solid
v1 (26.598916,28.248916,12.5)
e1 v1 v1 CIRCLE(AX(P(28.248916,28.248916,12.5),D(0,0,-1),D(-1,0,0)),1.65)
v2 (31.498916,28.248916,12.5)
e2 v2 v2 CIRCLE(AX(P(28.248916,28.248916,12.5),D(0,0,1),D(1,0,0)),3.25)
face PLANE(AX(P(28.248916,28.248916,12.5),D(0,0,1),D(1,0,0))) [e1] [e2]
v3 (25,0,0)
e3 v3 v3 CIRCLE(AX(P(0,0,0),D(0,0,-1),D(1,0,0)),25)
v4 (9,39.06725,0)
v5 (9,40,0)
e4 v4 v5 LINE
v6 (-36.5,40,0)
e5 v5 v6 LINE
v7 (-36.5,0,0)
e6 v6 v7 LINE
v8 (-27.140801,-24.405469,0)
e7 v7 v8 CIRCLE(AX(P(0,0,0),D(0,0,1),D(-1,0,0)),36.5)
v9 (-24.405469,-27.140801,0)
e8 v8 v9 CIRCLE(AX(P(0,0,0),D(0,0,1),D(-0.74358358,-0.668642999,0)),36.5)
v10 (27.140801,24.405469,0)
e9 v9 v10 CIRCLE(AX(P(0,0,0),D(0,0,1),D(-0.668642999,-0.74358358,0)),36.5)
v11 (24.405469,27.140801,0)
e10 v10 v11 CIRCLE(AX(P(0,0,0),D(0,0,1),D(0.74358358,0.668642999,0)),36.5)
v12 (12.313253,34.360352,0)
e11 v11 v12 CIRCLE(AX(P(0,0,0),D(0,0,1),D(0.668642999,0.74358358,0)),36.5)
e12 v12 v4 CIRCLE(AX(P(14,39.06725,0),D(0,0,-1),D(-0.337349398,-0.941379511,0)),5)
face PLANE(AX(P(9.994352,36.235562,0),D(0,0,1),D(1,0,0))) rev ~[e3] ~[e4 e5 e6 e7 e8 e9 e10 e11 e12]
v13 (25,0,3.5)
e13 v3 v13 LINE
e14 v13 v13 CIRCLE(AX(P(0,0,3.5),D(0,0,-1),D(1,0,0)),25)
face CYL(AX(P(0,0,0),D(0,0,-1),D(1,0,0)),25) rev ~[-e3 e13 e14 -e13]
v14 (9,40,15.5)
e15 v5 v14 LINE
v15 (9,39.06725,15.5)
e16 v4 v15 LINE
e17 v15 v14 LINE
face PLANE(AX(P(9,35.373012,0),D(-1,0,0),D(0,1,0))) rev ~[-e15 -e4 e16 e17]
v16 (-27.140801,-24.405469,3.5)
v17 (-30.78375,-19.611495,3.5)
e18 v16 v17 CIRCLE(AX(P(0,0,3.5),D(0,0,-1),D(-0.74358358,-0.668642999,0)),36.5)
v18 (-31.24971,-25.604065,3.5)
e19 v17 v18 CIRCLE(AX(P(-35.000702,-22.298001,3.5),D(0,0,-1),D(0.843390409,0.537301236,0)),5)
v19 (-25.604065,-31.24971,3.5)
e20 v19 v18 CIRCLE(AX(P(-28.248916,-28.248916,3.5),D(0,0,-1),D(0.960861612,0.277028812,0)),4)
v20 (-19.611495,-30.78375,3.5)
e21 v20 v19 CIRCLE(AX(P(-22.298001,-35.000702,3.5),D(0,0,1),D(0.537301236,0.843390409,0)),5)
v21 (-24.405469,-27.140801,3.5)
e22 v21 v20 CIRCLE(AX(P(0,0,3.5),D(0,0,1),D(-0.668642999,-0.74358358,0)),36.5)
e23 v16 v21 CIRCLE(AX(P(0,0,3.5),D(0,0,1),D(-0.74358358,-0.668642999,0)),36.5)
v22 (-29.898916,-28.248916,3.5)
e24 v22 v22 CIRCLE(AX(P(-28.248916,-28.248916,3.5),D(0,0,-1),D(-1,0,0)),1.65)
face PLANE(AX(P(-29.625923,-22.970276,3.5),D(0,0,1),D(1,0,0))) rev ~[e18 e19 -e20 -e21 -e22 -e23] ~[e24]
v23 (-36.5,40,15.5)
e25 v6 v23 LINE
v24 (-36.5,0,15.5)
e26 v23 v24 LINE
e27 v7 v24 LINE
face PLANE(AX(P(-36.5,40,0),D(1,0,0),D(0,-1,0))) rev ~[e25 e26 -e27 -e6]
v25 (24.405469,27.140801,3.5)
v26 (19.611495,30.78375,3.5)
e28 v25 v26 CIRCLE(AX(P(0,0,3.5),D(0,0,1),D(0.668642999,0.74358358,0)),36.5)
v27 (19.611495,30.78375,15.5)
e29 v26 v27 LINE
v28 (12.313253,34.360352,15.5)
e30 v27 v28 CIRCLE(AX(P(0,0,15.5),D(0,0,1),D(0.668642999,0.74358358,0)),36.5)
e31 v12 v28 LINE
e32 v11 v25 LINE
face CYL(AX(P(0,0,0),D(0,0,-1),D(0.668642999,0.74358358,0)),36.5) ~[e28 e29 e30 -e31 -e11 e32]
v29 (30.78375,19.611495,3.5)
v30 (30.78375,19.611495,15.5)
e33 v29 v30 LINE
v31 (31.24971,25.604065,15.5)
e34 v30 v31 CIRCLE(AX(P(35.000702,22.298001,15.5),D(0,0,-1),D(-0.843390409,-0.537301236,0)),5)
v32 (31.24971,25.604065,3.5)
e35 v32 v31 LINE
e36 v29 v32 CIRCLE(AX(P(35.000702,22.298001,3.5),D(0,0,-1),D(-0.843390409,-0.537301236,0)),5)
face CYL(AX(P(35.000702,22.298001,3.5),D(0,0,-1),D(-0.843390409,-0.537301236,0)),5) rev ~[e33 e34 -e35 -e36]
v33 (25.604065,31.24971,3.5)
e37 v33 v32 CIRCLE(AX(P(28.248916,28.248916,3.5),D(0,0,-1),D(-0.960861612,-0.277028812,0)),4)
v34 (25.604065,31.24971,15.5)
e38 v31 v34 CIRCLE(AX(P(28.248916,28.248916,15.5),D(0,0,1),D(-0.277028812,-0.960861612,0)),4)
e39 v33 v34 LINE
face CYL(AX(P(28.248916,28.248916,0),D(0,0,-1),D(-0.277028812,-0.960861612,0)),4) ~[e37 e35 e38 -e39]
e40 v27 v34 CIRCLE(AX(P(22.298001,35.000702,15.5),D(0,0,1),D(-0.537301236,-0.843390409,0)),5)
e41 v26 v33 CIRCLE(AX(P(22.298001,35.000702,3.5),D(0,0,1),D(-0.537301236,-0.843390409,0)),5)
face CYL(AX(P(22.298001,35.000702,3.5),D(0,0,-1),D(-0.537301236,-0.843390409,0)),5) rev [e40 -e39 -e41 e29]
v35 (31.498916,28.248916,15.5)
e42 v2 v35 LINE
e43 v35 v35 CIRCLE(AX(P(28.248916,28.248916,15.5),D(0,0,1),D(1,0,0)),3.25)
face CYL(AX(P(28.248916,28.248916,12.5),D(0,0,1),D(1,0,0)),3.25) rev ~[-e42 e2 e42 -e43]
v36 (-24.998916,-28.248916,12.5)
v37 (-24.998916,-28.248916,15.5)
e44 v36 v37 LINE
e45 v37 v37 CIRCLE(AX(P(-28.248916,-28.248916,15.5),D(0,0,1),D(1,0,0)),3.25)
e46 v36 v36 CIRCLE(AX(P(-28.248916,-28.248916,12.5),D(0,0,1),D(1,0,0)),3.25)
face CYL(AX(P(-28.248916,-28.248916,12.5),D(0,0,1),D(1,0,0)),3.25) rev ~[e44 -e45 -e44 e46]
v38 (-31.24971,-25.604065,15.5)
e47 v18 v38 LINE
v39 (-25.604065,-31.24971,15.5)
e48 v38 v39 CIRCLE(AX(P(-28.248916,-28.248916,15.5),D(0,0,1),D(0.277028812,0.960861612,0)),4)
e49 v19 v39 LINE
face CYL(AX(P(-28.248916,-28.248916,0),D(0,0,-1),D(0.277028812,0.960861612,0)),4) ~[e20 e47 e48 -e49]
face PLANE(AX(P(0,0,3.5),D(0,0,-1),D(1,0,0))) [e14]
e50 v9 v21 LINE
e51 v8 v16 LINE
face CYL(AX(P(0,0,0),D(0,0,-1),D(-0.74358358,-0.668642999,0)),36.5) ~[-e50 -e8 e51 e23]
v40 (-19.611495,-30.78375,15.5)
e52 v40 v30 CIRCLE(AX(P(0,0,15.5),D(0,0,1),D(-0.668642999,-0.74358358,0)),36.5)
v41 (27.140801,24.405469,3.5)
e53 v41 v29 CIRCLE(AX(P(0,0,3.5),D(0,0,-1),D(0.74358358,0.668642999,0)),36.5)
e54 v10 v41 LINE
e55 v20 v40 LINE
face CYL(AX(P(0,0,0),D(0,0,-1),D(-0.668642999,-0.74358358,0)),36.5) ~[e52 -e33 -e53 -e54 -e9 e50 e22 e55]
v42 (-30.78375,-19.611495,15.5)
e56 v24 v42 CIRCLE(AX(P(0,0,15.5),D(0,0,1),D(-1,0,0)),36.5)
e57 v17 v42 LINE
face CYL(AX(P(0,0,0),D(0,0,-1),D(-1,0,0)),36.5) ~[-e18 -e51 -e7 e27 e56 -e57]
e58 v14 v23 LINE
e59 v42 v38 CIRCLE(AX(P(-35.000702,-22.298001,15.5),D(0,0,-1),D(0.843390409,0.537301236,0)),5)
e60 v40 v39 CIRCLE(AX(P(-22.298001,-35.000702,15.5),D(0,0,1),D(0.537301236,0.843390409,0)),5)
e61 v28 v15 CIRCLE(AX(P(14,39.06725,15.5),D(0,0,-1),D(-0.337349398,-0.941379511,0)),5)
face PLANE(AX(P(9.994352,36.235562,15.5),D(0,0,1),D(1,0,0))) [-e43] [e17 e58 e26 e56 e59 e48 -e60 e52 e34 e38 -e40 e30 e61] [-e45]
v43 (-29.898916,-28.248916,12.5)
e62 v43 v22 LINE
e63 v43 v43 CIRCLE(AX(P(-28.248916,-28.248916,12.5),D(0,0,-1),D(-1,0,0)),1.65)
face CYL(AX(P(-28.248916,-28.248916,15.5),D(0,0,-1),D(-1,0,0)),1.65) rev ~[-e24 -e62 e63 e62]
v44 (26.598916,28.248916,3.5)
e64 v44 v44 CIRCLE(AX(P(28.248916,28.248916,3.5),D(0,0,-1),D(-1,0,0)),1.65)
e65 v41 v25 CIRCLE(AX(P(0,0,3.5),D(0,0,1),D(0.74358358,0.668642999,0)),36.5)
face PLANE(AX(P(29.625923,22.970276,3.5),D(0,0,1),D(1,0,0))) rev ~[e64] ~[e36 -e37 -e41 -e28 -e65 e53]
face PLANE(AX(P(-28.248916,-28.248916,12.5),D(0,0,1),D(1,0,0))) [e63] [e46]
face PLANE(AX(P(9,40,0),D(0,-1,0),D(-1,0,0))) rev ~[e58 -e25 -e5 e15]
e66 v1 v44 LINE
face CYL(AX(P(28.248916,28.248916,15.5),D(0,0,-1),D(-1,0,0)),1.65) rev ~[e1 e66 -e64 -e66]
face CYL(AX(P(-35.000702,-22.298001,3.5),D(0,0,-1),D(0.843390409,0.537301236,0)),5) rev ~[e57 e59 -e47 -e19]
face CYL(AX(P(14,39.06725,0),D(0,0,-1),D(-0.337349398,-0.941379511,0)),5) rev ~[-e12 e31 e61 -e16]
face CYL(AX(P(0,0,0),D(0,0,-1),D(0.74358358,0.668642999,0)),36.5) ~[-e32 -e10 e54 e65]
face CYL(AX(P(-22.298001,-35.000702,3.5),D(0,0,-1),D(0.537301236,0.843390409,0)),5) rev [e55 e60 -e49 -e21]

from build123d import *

# Parameters (mm, degrees)
F1_DEPTH       = 15.5
F2_R           = 25
F3_DEPTH       = 3.5
F5_D           = 3.3
F5_CBORE_D     = 6.5
F5_CBORE_DEPTH = 3
F6_T1_DEPTH    = 12
F6_T3_DEPTH    = 15.5


# Not quite as in the source:
# - a fillet or chamfer that OpenCascade refuses, or shapes differently, is made with other operations: its cross-section is extruded or revolved along the edge and cut away or added


with BuildPart() as f1:
    # F0 (on Top) → F1 (new body)
    with BuildSketch(Plane.XY):
        with BuildLine():
            ThreePointArc((27.1408006584, 24.4054694612), (31.0773430331, 31.0773430331), (24.4054694612, 27.1408006584))
            ThreePointArc((24.4054694612, 27.1408006584), (17.2024322308, 32.1920226973), (9, 35.3730123116))
            Line((9, 35.3730123116), (9, 40))
            Line((9, 40), (-36.5, 40))
            Line((-36.5, 40), (-36.5, 0))
            ThreePointArc((-36.5, 0), (-34.0799737678, -13.0692535358), (-27.1408006584, -24.4054694612))
            ThreePointArc((-27.1408006584, -24.4054694612), (-31.0773430331, -31.0773430331), (-24.4054694612, -27.1408006584))
            ThreePointArc((-24.4054694612, -27.1408006584), (25.8093975133, -25.8093975133), (27.1408006584, 24.4054694612))
        make_face()
    extrude(amount=F1_DEPTH)

    # F2 (on face) → F3 (cut)
    with BuildSketch(Plane(origin=(0, 0, 0), x_dir=(1, 0, 0), z_dir=(0, 0, -1))):
        with BuildLine():
            ThreePointArc((-27.1408006584, 24.4054694612), (-25.8093975133, 25.8093975133), (-24.4054694612, 27.1408006584))
            ThreePointArc((-24.4054694612, 27.1408006584), (-31.0773430331, 31.0773430331), (-27.1408006584, 24.4054694612))
        make_face()
        with BuildLine():
            ThreePointArc((27.1408006584, -24.4054694612), (25.8093975133, -25.8093975133), (24.4054694612, -27.1408006584))
            ThreePointArc((24.4054694612, -27.1408006584), (31.0773430331, -31.0773430331), (27.1408006584, -24.4054694612))
        make_face()
        Circle(F2_R)
    extrude(amount=-F3_DEPTH, mode=Mode.SUBTRACT)

    # F5 (through all)
    with Locations(Plane.XY.offset(15.5)):
        with Locations((-28.2489159084, -28.2489159084), (28.2489159084, 28.2489159084)):
            CounterBoreHole(F5_D / 2, F5_CBORE_D / 2, F5_CBORE_DEPTH)

    # F6: fillet of radius 5 on 5 edges, made by hand

    # F6_s2 → F6_t1 (join)
    with BuildSketch(Plane.XY.offset(3.5)):
        with BuildLine():
            ThreePointArc((-30.783749931, -19.6114951033), (-30.0157488678, -22.6856125629), (-31.2497097164, -25.6040649633))
            ThreePointArc((-31.2497097164, -25.6040649633), (-29.369056893, -24.4089570317), (-27.1408006584, -24.4054694612))
            ThreePointArc((-27.1408006584, -24.4054694612), (-29.0612962165, -22.0837284492), (-30.783749931, -19.6114951033))
        make_face()
        with BuildLine():
            ThreePointArc((-19.6114951033, -30.783749931), (-22.6856125629, -30.0157488678), (-25.6040649633, -31.2497097164))
            ThreePointArc((-25.6040649633, -31.2497097164), (-24.4089570317, -29.369056893), (-24.4054694612, -27.1408006584))
            ThreePointArc((-24.4054694612, -27.1408006584), (-22.0837284492, -29.0612962165), (-19.6114951033, -30.783749931))
        make_face()
        with BuildLine():
            ThreePointArc((30.783749931, 19.6114951033), (30.0157488678, 22.6856125629), (31.2497097164, 25.6040649633))
            ThreePointArc((31.2497097164, 25.6040649633), (29.369056893, 24.4089570317), (27.1408006584, 24.4054694612))
            ThreePointArc((27.1408006584, 24.4054694612), (29.0612962165, 22.0837284492), (30.783749931, 19.6114951033))
        make_face()
        with BuildLine():
            ThreePointArc((19.6114951033, 30.783749931), (22.6856125629, 30.0157488678), (25.6040649633, 31.2497097164))
            ThreePointArc((25.6040649633, 31.2497097164), (24.4089570317, 29.369056893), (24.4054694612, 27.1408006584))
            ThreePointArc((24.4054694612, 27.1408006584), (22.0837284492, 29.0612962165), (19.6114951033, 30.783749931))
        make_face()
    extrude(amount=F6_T1_DEPTH)

    # F6_s4 → F6_t3 (join)
    with BuildSketch(Plane.XY):
        with BuildLine():
            ThreePointArc((12.313253012, 34.3603521557), (9.9113734005, 36.189206534), (9, 39.0672497112))
            Line((9, 39.0672497112), (9, 35.3730123116))
            ThreePointArc((9, 35.3730123116), (10.6686483978, 34.9060158334), (12.313253012, 34.3603521557))
        make_face()
    extrude(amount=F6_T3_DEPTH)


solid = f1.part
